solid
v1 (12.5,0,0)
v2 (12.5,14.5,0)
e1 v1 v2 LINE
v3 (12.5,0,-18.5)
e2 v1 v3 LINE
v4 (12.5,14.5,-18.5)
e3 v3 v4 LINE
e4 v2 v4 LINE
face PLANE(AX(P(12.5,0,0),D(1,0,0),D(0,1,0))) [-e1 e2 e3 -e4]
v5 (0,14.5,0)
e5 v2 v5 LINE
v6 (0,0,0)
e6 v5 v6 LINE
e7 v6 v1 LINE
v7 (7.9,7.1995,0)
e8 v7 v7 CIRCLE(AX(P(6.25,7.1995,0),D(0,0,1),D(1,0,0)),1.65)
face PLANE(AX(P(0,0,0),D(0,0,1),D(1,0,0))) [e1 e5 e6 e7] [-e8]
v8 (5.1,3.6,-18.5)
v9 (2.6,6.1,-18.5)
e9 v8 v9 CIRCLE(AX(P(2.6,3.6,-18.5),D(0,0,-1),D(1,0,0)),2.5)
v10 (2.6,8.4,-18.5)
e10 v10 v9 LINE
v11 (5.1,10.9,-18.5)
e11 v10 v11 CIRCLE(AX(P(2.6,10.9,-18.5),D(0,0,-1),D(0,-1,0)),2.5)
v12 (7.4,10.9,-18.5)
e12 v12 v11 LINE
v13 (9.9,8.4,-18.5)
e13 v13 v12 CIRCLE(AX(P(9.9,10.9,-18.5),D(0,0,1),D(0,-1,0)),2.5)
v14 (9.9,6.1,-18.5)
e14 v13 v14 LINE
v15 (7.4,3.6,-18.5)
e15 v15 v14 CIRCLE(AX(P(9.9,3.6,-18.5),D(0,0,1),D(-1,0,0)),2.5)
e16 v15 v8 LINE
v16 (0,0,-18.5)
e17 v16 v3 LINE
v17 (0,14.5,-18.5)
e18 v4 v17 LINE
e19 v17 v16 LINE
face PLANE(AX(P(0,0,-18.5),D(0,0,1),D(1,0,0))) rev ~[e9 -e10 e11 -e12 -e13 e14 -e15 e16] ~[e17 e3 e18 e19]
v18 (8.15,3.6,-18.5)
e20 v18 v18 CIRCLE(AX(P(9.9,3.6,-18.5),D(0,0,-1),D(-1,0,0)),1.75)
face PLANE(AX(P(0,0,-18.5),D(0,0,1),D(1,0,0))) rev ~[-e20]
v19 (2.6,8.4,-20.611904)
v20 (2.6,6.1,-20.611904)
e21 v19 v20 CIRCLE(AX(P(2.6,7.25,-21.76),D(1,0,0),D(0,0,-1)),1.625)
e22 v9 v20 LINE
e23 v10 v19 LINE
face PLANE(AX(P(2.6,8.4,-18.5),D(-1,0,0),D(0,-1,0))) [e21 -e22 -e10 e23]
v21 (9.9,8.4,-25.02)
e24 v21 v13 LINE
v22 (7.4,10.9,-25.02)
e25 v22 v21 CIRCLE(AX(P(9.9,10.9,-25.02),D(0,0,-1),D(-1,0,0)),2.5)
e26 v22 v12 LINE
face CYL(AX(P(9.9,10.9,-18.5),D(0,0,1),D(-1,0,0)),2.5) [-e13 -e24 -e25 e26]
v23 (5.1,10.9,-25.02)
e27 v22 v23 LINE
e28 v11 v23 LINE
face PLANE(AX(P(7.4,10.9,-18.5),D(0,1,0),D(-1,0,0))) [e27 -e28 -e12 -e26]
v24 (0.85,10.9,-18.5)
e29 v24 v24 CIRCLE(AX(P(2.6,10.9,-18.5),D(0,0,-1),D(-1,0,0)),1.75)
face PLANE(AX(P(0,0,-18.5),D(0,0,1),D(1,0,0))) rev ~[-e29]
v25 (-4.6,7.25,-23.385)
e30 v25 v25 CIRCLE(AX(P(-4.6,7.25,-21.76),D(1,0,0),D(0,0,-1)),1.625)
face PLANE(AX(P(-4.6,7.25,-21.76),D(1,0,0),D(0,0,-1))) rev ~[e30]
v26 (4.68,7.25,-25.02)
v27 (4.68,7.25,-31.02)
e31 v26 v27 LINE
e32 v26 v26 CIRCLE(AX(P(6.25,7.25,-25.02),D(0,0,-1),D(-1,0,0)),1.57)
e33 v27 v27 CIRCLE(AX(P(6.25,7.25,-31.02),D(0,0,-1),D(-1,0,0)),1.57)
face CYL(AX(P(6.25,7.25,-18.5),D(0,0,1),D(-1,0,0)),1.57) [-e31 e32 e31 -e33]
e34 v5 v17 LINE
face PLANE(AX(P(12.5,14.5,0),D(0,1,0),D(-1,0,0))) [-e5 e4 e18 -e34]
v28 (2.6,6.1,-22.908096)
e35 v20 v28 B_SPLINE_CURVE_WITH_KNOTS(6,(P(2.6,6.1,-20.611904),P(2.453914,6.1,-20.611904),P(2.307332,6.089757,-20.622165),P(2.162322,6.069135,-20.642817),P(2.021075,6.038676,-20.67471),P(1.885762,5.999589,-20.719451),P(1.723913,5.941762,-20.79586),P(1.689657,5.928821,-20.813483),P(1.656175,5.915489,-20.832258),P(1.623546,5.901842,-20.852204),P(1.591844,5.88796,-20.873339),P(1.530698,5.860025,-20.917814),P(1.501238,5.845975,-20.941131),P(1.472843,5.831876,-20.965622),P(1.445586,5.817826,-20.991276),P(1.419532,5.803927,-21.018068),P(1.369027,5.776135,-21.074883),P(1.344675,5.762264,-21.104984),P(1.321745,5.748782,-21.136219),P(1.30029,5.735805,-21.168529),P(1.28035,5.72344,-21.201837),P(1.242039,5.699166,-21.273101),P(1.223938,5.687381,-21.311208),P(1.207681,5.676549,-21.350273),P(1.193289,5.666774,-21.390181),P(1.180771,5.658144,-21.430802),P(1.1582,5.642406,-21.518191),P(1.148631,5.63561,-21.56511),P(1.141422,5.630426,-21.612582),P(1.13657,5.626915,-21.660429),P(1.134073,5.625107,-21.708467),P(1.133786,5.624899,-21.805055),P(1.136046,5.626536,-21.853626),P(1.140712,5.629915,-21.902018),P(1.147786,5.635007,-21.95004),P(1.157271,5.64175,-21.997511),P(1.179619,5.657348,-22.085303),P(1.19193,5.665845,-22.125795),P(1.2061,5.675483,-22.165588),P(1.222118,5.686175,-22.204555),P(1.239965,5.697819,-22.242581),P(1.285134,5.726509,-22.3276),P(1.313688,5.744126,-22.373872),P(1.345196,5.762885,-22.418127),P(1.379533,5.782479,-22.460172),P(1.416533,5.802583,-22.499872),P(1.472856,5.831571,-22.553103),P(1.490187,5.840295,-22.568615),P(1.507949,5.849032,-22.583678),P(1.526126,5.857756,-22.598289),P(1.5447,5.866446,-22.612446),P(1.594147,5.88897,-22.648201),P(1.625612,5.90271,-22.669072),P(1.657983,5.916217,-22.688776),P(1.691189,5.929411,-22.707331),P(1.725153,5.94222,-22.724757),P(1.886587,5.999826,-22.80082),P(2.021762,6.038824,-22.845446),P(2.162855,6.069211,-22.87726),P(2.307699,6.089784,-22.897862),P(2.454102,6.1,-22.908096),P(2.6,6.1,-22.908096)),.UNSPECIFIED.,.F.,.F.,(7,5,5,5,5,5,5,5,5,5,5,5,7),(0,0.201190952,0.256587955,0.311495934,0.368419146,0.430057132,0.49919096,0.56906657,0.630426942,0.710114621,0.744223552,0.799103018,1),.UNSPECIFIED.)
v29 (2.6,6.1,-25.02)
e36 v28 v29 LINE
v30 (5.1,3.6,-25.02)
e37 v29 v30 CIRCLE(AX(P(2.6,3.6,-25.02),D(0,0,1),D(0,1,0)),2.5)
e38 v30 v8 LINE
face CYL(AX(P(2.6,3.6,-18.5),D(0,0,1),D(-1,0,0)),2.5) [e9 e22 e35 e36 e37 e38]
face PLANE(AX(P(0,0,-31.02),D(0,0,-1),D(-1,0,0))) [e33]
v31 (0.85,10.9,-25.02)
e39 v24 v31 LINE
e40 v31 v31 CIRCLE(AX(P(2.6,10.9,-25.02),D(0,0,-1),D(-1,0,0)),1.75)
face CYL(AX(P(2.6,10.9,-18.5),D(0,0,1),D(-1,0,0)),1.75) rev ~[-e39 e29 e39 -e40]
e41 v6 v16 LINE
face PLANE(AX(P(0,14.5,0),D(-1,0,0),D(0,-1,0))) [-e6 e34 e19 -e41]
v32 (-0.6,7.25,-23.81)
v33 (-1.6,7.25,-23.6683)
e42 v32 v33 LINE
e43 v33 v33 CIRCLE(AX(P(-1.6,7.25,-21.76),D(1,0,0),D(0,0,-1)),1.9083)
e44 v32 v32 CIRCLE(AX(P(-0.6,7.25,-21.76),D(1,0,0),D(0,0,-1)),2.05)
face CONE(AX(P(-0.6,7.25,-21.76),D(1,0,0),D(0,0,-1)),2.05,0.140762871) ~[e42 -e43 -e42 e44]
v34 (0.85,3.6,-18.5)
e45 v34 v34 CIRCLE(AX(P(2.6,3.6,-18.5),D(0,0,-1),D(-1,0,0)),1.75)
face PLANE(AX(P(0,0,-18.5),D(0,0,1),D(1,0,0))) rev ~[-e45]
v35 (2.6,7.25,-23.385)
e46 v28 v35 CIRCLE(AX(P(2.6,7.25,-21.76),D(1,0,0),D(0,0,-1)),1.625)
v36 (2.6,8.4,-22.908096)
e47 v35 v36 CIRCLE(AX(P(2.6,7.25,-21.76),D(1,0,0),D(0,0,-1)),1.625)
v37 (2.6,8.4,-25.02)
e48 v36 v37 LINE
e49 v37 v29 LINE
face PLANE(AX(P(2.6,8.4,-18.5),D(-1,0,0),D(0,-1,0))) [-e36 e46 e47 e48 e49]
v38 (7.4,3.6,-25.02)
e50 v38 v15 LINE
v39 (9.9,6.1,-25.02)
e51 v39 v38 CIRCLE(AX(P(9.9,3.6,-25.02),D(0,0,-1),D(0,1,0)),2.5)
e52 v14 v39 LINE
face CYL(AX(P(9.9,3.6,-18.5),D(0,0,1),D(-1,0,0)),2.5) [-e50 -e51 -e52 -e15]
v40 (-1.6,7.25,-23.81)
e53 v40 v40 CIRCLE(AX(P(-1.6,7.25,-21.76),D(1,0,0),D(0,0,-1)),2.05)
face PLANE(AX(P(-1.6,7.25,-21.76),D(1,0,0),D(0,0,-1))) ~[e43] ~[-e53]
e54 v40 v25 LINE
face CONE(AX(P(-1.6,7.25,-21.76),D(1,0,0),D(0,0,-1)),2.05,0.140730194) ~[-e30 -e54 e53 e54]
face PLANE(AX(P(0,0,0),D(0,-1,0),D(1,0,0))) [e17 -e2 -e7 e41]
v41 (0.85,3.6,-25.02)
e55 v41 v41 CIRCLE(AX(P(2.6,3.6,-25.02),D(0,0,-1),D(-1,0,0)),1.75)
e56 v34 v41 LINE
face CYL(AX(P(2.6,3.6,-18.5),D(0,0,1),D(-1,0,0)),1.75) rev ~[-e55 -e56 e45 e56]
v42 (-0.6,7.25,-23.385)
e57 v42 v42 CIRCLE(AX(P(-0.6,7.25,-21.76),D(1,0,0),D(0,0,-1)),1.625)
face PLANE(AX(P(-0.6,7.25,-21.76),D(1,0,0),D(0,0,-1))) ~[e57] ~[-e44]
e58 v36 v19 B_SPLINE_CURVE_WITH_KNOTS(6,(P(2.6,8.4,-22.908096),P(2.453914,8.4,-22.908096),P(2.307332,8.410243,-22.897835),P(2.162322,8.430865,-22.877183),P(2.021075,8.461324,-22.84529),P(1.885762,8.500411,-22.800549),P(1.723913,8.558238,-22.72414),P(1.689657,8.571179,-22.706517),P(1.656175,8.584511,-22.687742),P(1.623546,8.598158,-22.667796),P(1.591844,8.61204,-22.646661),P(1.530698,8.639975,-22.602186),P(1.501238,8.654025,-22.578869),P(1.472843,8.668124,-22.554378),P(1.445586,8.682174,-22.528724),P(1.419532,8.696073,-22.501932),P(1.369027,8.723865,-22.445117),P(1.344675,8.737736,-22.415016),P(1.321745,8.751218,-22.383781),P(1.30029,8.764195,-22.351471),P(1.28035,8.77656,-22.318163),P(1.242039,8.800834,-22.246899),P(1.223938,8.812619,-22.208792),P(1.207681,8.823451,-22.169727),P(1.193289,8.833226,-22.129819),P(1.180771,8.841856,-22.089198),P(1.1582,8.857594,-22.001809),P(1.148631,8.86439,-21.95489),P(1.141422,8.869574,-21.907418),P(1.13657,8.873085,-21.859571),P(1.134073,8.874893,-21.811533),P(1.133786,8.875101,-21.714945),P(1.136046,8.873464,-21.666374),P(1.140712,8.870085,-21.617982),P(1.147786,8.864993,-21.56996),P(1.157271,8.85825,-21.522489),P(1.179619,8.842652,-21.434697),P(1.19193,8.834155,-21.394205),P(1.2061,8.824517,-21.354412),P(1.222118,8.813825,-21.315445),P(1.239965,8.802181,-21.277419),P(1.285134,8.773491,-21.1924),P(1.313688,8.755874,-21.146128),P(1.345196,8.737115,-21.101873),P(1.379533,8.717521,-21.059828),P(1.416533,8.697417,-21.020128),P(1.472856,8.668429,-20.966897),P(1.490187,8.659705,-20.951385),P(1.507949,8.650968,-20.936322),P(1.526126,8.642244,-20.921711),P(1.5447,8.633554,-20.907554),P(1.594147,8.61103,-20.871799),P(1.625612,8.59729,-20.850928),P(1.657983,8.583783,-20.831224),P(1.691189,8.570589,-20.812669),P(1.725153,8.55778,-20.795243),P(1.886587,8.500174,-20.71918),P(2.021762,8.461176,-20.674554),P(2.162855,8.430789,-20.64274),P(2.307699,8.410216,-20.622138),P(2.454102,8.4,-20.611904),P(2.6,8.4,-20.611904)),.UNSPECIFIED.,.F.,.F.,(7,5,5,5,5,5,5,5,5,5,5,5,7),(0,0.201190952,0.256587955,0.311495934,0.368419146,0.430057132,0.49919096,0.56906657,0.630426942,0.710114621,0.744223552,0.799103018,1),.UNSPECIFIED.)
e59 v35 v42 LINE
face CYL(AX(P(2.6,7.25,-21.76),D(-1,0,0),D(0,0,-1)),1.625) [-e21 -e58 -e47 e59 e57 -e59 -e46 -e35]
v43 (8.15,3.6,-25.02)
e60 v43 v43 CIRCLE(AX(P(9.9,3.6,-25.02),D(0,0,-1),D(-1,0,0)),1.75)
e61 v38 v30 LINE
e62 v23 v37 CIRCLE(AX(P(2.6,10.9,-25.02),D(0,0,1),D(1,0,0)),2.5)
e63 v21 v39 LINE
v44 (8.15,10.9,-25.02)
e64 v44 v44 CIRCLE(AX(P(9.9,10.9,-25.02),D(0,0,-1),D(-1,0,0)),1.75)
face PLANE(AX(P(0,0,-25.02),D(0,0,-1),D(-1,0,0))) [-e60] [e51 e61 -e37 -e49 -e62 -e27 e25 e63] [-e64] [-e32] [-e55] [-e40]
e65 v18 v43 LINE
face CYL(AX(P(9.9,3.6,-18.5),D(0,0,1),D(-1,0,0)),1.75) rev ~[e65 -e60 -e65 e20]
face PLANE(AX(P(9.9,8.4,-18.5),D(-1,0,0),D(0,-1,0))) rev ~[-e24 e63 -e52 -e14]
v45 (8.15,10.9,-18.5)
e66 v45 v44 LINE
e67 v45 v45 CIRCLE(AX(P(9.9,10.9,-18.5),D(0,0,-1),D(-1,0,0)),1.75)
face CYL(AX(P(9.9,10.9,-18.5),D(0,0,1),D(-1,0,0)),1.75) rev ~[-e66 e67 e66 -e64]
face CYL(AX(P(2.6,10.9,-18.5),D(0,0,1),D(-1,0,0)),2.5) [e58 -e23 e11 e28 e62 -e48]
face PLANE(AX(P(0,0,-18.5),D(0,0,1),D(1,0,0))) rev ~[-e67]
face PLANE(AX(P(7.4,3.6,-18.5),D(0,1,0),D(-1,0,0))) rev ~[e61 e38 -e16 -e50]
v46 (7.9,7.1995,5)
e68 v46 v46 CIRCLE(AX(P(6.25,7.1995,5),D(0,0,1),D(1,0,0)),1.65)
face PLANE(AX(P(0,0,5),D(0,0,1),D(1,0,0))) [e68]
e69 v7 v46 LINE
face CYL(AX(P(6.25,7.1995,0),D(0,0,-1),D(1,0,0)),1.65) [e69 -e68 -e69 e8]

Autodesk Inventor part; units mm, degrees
ref_plane "YZ Plane" through (0, 0, 0) normal (1, 0, 0) x (0, 1, 0)
ref_plane "XZ Plane" through (0, 0, 0) normal (0, 1, 0) x (-1, 0, 0)
sketch "Sketch1" plane through (0, 0, 0) normal (0, 0, 1) x (1, 0, 0)
  line L0 (0, 0) -> (12.5, 0)
  line L1 (12.5, 0) -> (12.5, 14.5)
  line L2 (12.5, 14.5) -> (0, 14.5)
  line L3 (0, 14.5) -> (0, 0)
  dimension "d0" = 14.5
  dimension "d1" = 12.5
extrude "Extrusion1" add sketch "Sketch1" against normal blind 18.5
sketch "Sketch2" plane through (0, 0, -18.5) normal (0, 0, -1) x (-1, 0, 0)
  circle A0 centre (-9.9, 3.6) radius 2.5
  circle A1 centre (-2.6, 3.6) radius 2.5
  circle A2 centre (-2.6, 10.9) radius 2.5
  circle A3 centre (-9.9, 10.9) radius 2.5
  line L0 (-9.9, 10.9) -> (-9.9, 3.6) construction
  line L1 (-12.5, 14.5) -> (-12.5, 0) construction
  line L2 (-9.9, 10.9) -> (-2.6, 10.9) construction
  line L3 (0, 14.5) -> (-12.5, 14.5) construction
  line L4 (-7.4, 10.9) -> (-5.1, 10.9)
  line L5 (-2.6, 8.4) -> (-2.6, 6.1)
  line L6 (-7.4, 3.6) -> (-5.1, 3.6)
  line L7 (-9.9, 8.4) -> (-9.9, 6.1)
  circle A4 centre (-9.9, 10.9) radius 1.75
  circle A5 centre (-2.6, 10.9) radius 1.75
  circle A6 centre (-2.6, 3.6) radius 1.75
  circle A7 centre (-9.9, 3.6) radius 1.75
  circle A8 centre (-6.25, 7.25) radius 1.57
  point P0 (0, 0)
  point P1 (-9.9, 7.25)
  point P2 (-12.5, 7.25)
  point P3 (-6.25, 10.9)
  point P4 (-6.25, 14.5)
  point P5 (-6.25, 3.6)
  point P6 (-2.6, 7.25)
  dimension "d4" = 5
  dimension "d5" = 12.3
  dimension "d6" = 7.3
  dimension "d7" = 0.75
  dimension "d8" = 3.14
sketch "Sketch3" plane through (0, 0, 0) normal (0, 0, 1) x (1, 0, 0)
  circle A0 centre (6.25, 7.1995) radius 1.65
  point P0 (0, 0)
  dimension "d9" = 3.3
extrude "Extrusion2" add sketch "Sketch3" along normal blind 5
extrude "Extrusion3" add sketch "Sketch2" along normal blind 6.52
extrude "Extrusion4" add sketch "Sketch2" along normal blind 12.52 contours A8
ref_plane "Work Plane1" through (6.25, 0, 0) normal (1, 0, 0) x (0, 0, -1)
sketch "Sketch4" plane through (6.25, 0, 0) normal (1, 0, 0) x (0, 0, -1)
  line L0 (18.5, 10.9) -> (25.02, 10.9) projected
  line L1 (21.76, 10.9) -> (23.385, 10.9)
  line L2 (23.385, 10.9) -> (23.385, 14.1)
  line L3 (23.385, 18.1) -> (21.76, 18.1)
  line L4 (21.76, 18.1) -> (21.76, 10.9)
  line L5 (21.76, 10.9) -> (23.385, 10.9)
  line L6 (23.385, 10.9) -> (23.385, 14.1)
  line L7 (21.76, 18.1) -> (21.76, 15.1)
  line L8 (23.6683, 15.1) -> (23.81, 15.1)
  line L9 (23.81, 15.1) -> (23.385, 18.1)
  line L10 (21.76, 18.1) -> (21.76, 14.1)
  line L11 (23.385, 14.1) -> (23.81, 14.1)
  line L12 (23.81, 14.1) -> (23.6683, 15.1)
  point P0 (0, 0)
  dimension "d16" = 1.625
  dimension "d17" = 7.2
  dimension "d18" = 90
  dimension "d19" = 3
  dimension "d20" = 2.05
  dimension "d21" = 4
  dimension "d22" = 1.625
  dimension "d23" = 2.05
  dimension "d24" = 3
revolve "Revolution1" add sketch "Sketch4" angle 360 about axis through (6.25, 18.1, -21.76) along (0, -1, 0)
pattern_circular "Circular Pattern1" count 4 over 360 about axis through (6.25, 7.25, -18.5) along (0, 0, -1) of "Revolution1"
delete faces "Delete Face1" heal yes whole lump no faces at (8.0785, 15.7667, -22.4534) (5.7435, 18.1, -22.5272) (8.079, 14.2111, -22.6505) (7.3088, 12.1519, -20.5273) (6.0865, 14.1, -23.6485) (6.0865, 15.1, -23.7429) (14.7667, 7.718, -23.6587) (14.1, 6.0575, -23.3527) (13.2111, 5.421, -22.6505) (13.1, 7.4135, -23.6485) (11.1519, 6.1912, -20.5273) (17.1, 7.7565, -22.5272) (6.718, -1.2667, -23.6587) (4.421, 0.2889, -22.6505) (5.0575, -0.6, -23.3527) (6.4135, 0.4, -23.6485) (5.1912, 2.3481, -20.5273) (6.7565, -3.6, -22.5272)
properties part number "Adafruit_1528-4663-ND"
